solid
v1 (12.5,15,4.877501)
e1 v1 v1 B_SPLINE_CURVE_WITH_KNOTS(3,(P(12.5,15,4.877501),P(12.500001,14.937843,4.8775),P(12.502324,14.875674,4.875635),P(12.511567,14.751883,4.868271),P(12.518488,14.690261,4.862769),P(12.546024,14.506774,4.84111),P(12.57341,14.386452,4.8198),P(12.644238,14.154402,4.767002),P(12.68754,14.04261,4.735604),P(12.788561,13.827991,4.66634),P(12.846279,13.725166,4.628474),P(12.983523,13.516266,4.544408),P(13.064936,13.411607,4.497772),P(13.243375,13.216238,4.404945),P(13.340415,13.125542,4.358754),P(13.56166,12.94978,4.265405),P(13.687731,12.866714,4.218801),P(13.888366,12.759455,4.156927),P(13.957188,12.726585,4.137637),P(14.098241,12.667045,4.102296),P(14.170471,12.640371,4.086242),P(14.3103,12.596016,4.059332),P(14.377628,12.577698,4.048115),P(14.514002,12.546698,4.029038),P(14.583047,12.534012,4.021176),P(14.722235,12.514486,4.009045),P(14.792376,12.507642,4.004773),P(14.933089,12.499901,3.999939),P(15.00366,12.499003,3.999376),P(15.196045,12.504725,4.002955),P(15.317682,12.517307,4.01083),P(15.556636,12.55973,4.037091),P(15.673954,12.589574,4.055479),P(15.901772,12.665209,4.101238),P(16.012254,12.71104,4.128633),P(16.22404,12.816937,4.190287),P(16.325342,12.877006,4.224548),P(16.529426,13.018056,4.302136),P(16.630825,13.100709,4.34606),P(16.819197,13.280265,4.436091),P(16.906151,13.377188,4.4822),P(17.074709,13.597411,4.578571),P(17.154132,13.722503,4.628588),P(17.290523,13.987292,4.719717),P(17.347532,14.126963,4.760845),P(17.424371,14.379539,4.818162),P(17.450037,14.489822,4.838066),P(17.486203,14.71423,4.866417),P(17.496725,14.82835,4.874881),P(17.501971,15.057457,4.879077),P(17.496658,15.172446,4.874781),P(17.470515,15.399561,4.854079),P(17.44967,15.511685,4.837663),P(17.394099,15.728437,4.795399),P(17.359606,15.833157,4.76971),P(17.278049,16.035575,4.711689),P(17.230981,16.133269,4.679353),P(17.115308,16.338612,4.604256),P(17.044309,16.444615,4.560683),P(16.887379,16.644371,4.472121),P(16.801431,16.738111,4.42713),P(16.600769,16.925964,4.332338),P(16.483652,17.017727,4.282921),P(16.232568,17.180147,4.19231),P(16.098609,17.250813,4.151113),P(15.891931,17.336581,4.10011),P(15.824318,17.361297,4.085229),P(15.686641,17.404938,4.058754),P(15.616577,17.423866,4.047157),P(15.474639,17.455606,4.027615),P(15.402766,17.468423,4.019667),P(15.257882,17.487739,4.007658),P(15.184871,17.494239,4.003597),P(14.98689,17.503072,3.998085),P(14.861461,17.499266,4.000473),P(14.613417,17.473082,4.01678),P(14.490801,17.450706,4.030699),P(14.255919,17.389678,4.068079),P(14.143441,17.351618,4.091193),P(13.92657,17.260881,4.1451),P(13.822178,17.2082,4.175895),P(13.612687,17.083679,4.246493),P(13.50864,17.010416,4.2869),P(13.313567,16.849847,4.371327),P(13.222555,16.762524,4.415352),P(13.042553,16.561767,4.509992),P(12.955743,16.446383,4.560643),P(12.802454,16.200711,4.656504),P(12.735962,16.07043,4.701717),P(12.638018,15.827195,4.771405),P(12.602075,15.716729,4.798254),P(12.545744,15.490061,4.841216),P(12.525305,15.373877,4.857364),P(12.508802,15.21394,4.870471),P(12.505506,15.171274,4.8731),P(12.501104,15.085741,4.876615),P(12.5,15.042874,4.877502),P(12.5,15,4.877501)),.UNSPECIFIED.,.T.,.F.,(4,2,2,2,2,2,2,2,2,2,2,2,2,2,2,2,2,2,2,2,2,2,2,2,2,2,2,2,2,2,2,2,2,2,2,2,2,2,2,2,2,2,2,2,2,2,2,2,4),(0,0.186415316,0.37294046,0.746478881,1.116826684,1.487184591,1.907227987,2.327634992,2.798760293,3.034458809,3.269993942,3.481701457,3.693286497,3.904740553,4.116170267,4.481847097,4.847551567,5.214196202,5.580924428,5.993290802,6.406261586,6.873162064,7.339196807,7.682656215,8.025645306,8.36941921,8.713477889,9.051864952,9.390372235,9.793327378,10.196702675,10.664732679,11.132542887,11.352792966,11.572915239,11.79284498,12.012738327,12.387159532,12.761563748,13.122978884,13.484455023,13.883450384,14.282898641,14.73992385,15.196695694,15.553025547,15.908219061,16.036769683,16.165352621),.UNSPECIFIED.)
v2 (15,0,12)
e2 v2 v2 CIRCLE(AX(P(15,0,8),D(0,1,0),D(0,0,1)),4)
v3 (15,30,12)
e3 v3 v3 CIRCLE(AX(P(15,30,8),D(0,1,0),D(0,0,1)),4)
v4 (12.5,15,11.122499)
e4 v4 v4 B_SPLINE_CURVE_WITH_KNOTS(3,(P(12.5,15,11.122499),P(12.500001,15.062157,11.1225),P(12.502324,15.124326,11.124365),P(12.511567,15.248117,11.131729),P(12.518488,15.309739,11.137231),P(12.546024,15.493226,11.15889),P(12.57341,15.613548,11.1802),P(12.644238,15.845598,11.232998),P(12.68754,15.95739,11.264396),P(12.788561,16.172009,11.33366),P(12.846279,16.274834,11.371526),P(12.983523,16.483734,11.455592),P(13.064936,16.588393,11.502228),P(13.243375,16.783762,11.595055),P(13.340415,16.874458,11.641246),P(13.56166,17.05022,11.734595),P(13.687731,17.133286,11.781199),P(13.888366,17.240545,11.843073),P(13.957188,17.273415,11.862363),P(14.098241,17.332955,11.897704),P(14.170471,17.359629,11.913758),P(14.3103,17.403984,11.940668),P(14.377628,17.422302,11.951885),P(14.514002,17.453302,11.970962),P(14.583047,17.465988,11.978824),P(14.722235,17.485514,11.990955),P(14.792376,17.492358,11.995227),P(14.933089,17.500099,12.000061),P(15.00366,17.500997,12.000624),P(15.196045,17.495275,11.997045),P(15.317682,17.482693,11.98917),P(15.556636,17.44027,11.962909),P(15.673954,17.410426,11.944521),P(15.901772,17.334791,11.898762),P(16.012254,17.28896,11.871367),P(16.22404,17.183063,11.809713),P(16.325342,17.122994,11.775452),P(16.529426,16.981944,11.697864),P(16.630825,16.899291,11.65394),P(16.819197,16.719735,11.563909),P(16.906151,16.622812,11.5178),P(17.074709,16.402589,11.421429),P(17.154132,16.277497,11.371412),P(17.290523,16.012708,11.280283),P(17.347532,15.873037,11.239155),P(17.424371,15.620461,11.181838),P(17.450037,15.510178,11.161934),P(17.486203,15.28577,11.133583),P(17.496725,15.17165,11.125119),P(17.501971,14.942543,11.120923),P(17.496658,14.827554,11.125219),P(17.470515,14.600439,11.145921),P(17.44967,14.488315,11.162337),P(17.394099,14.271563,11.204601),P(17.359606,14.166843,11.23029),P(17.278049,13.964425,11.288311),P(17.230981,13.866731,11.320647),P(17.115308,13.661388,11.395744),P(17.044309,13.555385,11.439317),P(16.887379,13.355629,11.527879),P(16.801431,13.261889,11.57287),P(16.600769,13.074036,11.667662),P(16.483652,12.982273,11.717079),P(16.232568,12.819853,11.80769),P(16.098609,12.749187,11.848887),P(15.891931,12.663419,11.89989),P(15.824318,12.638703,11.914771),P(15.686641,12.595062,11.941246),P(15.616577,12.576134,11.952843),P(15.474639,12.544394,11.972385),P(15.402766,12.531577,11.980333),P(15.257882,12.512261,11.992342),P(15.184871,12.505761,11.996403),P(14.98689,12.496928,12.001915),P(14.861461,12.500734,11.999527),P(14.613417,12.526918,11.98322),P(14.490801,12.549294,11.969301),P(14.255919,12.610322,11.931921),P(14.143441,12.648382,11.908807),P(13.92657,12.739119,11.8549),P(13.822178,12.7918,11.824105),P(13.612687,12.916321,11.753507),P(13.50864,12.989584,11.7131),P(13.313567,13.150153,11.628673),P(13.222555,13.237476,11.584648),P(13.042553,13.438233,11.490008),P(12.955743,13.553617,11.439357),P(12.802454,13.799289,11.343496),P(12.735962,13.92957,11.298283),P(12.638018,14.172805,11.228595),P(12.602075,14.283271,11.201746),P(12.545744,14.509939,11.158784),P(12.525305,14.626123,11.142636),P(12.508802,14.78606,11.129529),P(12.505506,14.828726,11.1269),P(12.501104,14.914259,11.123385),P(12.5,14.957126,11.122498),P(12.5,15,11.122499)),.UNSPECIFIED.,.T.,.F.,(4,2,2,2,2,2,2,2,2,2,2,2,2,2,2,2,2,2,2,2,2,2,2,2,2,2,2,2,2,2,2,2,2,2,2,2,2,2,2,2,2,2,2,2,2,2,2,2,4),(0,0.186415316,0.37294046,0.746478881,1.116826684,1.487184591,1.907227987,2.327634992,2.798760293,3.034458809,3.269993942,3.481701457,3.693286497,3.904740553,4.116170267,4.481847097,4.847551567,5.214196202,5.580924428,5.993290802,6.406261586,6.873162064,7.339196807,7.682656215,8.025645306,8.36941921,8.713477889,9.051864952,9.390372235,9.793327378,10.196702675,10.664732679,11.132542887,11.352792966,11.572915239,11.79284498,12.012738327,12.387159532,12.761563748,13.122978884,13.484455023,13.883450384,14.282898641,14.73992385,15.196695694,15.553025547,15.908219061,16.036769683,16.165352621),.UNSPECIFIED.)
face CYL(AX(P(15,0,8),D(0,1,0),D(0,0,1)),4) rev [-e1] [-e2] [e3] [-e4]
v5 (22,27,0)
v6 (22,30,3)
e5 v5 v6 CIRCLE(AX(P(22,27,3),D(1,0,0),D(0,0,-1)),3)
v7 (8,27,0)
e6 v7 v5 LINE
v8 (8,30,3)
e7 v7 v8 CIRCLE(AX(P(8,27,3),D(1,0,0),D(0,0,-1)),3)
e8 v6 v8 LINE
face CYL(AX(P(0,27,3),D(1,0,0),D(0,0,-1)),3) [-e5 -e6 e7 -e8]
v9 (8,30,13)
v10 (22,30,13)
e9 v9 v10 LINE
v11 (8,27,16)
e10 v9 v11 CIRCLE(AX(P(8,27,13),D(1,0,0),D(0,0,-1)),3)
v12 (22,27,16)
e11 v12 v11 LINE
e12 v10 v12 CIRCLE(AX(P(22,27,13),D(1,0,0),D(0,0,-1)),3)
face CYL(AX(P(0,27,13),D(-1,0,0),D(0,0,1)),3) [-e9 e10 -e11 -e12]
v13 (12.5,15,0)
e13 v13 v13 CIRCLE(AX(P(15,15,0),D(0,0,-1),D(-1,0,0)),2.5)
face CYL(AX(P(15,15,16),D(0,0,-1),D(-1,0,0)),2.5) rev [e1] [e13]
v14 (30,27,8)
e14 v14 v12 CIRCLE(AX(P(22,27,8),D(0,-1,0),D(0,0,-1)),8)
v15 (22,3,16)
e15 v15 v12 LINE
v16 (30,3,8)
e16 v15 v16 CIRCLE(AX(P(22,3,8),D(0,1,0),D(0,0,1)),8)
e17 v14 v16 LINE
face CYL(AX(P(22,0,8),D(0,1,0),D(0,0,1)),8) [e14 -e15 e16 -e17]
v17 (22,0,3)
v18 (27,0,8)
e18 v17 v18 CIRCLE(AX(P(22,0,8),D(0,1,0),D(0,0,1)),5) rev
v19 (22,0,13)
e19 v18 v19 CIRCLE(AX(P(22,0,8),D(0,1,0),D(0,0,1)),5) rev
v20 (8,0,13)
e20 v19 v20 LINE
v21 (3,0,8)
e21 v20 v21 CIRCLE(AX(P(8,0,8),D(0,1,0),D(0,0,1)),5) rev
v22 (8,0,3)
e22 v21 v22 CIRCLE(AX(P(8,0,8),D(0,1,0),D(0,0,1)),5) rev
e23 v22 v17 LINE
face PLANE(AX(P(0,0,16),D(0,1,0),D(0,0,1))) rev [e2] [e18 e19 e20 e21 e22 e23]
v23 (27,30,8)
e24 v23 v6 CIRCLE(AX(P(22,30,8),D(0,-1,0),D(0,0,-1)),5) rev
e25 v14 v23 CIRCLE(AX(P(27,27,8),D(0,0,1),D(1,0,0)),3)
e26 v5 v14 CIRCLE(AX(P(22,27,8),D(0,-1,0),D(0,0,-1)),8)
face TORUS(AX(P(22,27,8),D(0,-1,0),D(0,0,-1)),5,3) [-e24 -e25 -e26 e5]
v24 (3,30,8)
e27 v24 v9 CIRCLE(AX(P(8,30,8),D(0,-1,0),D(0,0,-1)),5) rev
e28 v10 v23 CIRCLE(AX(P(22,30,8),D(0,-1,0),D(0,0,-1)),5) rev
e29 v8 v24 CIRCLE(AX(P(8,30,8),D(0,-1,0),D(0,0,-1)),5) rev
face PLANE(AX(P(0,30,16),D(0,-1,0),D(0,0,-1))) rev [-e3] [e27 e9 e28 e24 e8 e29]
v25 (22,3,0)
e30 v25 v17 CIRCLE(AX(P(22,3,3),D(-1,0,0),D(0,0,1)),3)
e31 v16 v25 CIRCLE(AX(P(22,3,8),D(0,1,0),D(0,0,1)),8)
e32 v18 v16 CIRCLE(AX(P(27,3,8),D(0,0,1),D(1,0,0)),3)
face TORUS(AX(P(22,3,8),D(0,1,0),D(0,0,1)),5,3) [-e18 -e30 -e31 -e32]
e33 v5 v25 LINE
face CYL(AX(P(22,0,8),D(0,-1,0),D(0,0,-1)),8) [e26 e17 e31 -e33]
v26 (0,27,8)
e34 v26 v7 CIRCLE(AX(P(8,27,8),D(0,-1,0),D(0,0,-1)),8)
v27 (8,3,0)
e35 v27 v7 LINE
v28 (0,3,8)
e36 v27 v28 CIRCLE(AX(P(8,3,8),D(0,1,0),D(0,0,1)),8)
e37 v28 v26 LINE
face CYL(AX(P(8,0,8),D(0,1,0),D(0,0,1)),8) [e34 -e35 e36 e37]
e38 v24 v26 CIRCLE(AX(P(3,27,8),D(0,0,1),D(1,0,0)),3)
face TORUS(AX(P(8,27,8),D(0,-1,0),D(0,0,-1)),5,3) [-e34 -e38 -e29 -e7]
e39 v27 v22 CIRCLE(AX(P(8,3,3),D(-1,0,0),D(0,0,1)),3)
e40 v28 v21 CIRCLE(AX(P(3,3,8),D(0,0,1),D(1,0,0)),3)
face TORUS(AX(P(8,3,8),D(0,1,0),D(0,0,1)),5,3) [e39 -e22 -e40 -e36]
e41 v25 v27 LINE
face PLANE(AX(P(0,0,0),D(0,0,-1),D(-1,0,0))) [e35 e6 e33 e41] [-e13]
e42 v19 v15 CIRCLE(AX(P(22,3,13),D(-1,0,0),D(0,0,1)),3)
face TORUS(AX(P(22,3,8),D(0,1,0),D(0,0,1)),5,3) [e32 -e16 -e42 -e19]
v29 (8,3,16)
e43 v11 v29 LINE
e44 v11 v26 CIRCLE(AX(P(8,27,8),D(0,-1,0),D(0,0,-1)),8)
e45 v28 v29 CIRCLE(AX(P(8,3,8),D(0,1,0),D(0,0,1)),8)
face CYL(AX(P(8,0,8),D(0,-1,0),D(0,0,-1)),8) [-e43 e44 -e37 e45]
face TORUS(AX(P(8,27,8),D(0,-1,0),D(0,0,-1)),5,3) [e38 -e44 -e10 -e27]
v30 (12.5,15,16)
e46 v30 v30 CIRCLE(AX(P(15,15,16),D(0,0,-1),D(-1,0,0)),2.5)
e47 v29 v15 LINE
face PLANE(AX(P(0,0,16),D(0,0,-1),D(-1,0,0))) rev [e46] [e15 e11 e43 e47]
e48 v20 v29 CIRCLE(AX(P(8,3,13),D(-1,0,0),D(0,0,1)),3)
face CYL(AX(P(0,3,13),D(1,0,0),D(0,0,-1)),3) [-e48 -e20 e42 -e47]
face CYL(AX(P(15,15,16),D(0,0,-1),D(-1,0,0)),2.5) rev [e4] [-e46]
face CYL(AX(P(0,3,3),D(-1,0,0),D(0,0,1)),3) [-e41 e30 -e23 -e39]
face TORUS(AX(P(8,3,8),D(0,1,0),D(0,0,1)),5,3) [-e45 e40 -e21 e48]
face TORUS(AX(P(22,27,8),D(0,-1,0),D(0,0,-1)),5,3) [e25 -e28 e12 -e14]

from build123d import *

# Parameters (mm, degrees)
SKETCH1_W           = 30
SKETCH1_H           = 30
BOSS_EXTRUDE1_DEPTH = 16
SKETCH2_R           = 2.5
CUT_EXTRUDE1_DEPTH  = 46.343136195
SKETCH3_R           = 4
CUT_EXTRUDE2_DEPTH  = 46.343136195
FILLET1_R           = 8
FILLET2_R           = 3


with BuildPart() as part:
    # Sketch1 → Boss-Extrude1 (new body)
    with BuildSketch(Plane.XY):
        with Locations((15, 15)):
            Rectangle(SKETCH1_W, SKETCH1_H)
    extrude(amount=BOSS_EXTRUDE1_DEPTH)

    # Sketch2 → Cut-Extrude1 (cut, through all)
    with BuildSketch(Plane(origin=(0, 0, 0), x_dir=(-1, 0, 0), z_dir=(0, 0, -1))):
        with Locations((-15, 15)):
            Circle(SKETCH2_R)
    extrude(amount=-CUT_EXTRUDE1_DEPTH, mode=Mode.SUBTRACT)

    # Sketch3 → Cut-Extrude2 (cut, through all)
    with BuildSketch(Plane(origin=(0, 30, 0), x_dir=(1, 0, 0), z_dir=(0, 1, 0))):
        with Locations(Location((15, -8, 0), (0, 0, 270))):
            Circle(SKETCH3_R)
    extrude(amount=-CUT_EXTRUDE2_DEPTH, mode=Mode.SUBTRACT)

    # Fillet1
    fillet1_edges = [part.edges().sort_by_distance(p)[0] for p in [
        (30, 15, 0),
        (30, 15, 16),
        (0, 15, 0),
        (0, 15, 16),
    ]]
    fillet(fillet1_edges, radius=FILLET1_R - 0.0001)  # a hair under: the kernel refuses the full size

    # Fillet2
    fillet2_edges = [part.edges().sort_by_distance(p)[0] for p in [
        (15, 30, 0),
        (15, 30, 16),
        (2.343116461, 30, 13.656883539),
        (2.343116461, 30, 2.343116461),
        (27.656883539, 30, 13.656883539),
        (27.656883539, 30, 2.343116461),
        (15, 0, 0),
        (15, 0, 16),
        (2.343116461, 0, 13.656883539),
        (2.343116461, 0, 2.343116461),
        (27.656883539, 0, 13.656883539),
        (27.656883539, 0, 2.343116461),
    ]]
    fillet(fillet2_edges, radius=FILLET2_R)


solid = part.part
